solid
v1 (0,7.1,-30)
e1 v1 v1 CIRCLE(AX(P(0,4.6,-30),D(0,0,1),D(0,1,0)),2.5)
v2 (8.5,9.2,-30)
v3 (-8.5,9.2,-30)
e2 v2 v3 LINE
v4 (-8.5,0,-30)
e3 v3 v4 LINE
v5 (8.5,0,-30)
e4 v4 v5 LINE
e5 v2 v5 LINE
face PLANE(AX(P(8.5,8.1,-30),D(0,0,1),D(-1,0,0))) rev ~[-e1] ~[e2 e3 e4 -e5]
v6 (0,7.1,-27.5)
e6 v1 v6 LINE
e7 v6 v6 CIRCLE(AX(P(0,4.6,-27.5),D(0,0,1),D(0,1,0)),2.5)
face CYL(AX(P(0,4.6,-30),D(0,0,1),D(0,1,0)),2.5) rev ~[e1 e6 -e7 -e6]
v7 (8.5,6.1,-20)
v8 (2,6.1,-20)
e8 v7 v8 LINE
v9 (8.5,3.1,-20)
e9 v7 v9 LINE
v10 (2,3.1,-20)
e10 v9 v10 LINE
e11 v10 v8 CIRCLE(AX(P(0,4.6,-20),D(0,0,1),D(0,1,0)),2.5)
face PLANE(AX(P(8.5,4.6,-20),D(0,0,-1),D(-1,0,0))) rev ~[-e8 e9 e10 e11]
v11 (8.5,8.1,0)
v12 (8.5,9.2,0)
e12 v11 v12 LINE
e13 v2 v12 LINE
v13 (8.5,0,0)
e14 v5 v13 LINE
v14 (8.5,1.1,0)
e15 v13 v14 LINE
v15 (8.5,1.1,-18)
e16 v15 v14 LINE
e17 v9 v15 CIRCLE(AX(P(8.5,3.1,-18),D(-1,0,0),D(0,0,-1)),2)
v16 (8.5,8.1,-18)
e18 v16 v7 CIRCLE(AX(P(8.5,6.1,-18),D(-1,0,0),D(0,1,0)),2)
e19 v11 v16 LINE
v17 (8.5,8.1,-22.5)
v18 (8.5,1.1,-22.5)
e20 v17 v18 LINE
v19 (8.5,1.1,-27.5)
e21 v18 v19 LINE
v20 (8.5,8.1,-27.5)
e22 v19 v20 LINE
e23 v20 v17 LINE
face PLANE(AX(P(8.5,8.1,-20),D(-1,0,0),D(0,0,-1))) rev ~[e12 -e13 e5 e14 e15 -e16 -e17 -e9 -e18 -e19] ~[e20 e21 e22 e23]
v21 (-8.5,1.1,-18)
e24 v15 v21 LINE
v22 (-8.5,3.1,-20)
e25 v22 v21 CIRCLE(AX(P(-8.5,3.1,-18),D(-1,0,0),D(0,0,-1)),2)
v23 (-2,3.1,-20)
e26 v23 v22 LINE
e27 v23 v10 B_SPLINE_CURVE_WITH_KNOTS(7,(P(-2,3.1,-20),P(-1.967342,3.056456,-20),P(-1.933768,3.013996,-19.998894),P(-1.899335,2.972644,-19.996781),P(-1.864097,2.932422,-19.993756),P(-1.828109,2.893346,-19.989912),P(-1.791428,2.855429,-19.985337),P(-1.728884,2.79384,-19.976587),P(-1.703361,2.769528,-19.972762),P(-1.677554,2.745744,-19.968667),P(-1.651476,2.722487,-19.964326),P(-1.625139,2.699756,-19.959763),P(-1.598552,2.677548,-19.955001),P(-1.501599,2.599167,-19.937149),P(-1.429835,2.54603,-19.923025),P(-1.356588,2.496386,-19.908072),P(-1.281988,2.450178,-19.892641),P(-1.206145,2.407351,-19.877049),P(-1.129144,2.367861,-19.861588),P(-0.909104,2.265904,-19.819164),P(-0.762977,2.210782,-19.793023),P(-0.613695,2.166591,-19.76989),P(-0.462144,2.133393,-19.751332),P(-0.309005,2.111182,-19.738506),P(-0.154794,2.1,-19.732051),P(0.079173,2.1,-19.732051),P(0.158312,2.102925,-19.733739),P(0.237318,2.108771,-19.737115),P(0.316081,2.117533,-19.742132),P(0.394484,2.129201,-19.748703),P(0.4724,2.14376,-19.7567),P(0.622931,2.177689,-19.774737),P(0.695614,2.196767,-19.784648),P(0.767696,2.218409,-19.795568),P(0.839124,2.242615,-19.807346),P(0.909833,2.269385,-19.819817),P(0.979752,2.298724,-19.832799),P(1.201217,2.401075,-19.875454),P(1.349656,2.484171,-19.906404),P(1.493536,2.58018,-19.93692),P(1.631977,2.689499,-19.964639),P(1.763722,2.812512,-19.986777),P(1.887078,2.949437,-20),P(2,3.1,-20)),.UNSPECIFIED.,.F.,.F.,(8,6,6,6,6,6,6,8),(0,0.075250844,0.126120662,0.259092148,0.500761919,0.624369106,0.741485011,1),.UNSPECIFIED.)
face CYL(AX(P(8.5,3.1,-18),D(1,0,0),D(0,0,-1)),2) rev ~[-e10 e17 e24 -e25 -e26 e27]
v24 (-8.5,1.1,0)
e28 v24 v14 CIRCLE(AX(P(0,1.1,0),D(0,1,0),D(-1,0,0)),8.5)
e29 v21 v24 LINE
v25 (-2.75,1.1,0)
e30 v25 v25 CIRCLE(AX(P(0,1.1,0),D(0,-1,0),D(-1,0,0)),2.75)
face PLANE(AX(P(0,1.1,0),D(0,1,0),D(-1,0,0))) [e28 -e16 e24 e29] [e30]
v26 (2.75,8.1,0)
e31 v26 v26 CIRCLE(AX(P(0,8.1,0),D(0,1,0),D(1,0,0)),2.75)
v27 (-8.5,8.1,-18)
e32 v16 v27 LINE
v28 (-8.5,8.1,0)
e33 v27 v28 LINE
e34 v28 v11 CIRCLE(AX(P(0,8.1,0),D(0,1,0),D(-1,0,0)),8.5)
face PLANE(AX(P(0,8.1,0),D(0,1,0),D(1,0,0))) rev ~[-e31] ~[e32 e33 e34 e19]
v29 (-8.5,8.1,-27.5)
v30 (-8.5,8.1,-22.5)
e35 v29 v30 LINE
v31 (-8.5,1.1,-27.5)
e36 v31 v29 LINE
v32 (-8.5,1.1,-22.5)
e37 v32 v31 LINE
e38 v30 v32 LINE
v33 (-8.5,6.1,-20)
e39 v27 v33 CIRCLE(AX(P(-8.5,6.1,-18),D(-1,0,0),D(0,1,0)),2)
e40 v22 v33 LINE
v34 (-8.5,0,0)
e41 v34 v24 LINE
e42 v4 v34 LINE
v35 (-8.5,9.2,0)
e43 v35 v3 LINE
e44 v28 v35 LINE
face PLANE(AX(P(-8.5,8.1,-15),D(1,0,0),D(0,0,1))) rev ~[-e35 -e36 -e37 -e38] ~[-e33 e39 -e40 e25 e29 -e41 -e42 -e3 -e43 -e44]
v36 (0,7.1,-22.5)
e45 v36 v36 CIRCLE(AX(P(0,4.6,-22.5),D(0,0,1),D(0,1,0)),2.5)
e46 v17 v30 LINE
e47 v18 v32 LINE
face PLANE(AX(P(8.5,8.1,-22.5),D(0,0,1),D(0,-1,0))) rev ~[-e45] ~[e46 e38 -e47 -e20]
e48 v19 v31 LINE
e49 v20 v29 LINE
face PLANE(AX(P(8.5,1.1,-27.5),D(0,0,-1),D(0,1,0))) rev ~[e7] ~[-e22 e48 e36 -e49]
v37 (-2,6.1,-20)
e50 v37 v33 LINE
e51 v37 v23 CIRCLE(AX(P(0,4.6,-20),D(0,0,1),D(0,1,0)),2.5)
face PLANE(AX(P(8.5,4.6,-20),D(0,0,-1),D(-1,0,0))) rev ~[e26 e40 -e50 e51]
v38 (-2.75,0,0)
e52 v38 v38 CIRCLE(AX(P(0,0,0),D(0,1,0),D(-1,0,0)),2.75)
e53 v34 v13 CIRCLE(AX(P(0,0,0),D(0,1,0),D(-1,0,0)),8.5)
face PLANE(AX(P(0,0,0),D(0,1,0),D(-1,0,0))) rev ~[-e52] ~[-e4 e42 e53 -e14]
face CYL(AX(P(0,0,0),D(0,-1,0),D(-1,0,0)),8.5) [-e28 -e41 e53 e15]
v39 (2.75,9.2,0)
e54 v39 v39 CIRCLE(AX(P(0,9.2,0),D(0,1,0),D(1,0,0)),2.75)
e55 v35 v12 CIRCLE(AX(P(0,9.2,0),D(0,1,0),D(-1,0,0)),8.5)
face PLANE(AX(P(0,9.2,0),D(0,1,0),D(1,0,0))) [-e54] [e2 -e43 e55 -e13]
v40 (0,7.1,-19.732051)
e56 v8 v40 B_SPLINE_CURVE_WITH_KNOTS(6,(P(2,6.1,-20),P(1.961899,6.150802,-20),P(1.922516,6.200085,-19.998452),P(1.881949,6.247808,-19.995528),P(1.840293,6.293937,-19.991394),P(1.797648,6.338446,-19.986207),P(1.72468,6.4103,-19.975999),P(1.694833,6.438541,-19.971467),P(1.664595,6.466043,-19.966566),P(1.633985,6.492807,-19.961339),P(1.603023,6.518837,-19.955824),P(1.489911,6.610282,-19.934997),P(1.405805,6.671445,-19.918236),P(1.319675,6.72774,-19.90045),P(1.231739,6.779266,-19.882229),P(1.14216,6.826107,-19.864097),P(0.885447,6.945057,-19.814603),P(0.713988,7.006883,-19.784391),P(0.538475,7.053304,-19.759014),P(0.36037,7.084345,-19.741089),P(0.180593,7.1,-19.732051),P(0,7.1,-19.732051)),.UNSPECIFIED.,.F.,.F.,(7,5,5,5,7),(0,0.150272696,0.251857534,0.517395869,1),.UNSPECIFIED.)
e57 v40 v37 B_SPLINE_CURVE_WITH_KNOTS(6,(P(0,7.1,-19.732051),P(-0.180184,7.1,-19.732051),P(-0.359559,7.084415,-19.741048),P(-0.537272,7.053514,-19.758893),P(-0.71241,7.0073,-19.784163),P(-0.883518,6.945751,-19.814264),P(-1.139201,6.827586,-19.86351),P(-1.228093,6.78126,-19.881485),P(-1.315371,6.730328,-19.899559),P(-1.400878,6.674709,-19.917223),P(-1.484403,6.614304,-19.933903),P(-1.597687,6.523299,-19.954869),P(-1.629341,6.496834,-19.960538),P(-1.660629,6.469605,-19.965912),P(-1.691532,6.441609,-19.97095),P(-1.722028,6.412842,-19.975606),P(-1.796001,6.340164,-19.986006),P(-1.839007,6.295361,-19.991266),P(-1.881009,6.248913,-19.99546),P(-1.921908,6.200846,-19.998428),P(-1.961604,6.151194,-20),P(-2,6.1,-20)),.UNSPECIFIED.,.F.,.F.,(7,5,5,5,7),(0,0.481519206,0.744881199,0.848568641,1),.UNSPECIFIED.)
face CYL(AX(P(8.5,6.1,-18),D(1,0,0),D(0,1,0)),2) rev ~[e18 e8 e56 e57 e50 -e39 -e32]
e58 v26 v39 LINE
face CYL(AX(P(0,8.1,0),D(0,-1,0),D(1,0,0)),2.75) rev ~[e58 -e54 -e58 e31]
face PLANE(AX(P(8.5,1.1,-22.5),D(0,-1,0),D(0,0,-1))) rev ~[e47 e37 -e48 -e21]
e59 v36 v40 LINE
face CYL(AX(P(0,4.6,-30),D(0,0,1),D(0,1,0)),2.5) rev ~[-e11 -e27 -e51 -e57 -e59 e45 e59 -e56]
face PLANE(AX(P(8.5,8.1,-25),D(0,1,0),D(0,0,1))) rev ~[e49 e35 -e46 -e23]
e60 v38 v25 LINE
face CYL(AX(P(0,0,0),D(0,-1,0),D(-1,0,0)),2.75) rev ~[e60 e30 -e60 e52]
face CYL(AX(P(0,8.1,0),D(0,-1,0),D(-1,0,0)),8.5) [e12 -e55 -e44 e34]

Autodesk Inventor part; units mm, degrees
ref_plane "YZ Plane" through (0, 0, 0) normal (1, 0, 0) x (0, 1, 0)
sketch "Esquisse1" plane through (0, 0, 0) normal (0, 1, 0) x (-1, 0, 0)
  circle A0 centre (0, 0) radius 8.5
  circle A1 centre (0, 0) radius 2.75
  line L0 (0, 0) -> (0, -30)
  line L1 (8.5, -30) -> (8.5, 0)
  line L2 (-8.5, -30) -> (-8.5, 0)
  line L3 (8.5, -30) -> (-8.5, -30)
  dimension "d0" = 17
  dimension "d1" = 5.5
  dimension "d4" = 30
  dimension "d5" = 30
  dimension "d6" = 30
extrude "Extrusion1" add sketch "Esquisse1" along normal blind 1.1
ref_plane "Plan de construction1" through (0, 8.1, 0) normal (0, 1, 0) x (1, 0, 0)
sketch "Esquisse3" plane through (0, 8.1, 0) normal (0, 1, 0) x (1, 0, 0)
  arc A0 (-8.5, 0) -> (8.5, 0) centre (0, 0) ccw projected
  line L0 (-8.5, 20) -> (-8.5, 0) projected
  line L1 (8.5, 0) -> (8.5, 20) projected
  line L2 (-8.5, 30) -> (-8.5, 15) projected
  line L3 (8.5, 30) -> (-8.5, 30) projected
  line L4 (8.5, 15) -> (8.5, 30) projected
  circle A1 centre (0, 0) radius 2.75 projected
extrude "Extrusion3" add sketch "Esquisse3" along normal blind 1.1
ref_plane "Plan de construction2" through (0, 4.6, 0) normal (0, -1, 0) x (1, 0, 0)
sketch "Esquisse7" plane through (0, 4.6, 0) normal (0, -1, 0) x (1, 0, 0)
  line L0 (8.5, -30) -> (-8.5, -30) projected
  line L1 (-8.5, -30) -> (8.5, -30)
  line L2 (8.5, -30) -> (8.5, -20)
  line L3 (8.5, -20) -> (-8.5, -20)
  line L4 (-8.5, -20) -> (-8.5, -30)
  point P0 (0, 0)
  dimension "d41" = 10
extrude "Extrusion5" add sketch "Esquisse7" along normal mid plane 7
sketch "Esquisse8" plane through (8.5, 0, 0) normal (1, 0, 0) x (0, 0, -1)
  line L0 (20, 8.1) -> (0, 8.1) projected
  line L1 (30, 0) -> (30, 9.2) projected
  line L2 (0, 0) -> (30, 0) projected
  line L3 (25, 8.1) -> (27.5, 8.1)
  line L4 (27.5, 8.1) -> (22.5, 8.1)
  line L5 (22.5, 8.1) -> (22.5, 1.1)
  line L6 (22.5, 1.1) -> (27.5, 1.1)
  line L7 (27.5, 1.1) -> (27.5, 8.1)
  line L8 (0, 9.2) -> (30, 9.2) projected
  dimension "d43" = 5
  dimension "d44" = 7
  dimension "d45" = 1.1
  dimension "d46" = 2.5
extrude "Extrusion6" cut sketch "Esquisse8" against normal through all
sketch "Esquisse9" plane through (8.5, 0, -30) normal (0, 0, -1) x (-1, 0, 0)
  line L0 (5.75, 9.2) -> (11.25, 9.2) projected
  line L1 (8.5, 9.2) -> (8.5, 0)
  point P0 (8.5, 4.6)
hole "Perçage3" at (0, 4.6, -30) direction (0, 0, 1) diameter 5 end through all
fillet "Congé3" radius 2 2 edges at (0, 8.1, -20) (0, 1.1, -20)
properties part number "bielle sup"
